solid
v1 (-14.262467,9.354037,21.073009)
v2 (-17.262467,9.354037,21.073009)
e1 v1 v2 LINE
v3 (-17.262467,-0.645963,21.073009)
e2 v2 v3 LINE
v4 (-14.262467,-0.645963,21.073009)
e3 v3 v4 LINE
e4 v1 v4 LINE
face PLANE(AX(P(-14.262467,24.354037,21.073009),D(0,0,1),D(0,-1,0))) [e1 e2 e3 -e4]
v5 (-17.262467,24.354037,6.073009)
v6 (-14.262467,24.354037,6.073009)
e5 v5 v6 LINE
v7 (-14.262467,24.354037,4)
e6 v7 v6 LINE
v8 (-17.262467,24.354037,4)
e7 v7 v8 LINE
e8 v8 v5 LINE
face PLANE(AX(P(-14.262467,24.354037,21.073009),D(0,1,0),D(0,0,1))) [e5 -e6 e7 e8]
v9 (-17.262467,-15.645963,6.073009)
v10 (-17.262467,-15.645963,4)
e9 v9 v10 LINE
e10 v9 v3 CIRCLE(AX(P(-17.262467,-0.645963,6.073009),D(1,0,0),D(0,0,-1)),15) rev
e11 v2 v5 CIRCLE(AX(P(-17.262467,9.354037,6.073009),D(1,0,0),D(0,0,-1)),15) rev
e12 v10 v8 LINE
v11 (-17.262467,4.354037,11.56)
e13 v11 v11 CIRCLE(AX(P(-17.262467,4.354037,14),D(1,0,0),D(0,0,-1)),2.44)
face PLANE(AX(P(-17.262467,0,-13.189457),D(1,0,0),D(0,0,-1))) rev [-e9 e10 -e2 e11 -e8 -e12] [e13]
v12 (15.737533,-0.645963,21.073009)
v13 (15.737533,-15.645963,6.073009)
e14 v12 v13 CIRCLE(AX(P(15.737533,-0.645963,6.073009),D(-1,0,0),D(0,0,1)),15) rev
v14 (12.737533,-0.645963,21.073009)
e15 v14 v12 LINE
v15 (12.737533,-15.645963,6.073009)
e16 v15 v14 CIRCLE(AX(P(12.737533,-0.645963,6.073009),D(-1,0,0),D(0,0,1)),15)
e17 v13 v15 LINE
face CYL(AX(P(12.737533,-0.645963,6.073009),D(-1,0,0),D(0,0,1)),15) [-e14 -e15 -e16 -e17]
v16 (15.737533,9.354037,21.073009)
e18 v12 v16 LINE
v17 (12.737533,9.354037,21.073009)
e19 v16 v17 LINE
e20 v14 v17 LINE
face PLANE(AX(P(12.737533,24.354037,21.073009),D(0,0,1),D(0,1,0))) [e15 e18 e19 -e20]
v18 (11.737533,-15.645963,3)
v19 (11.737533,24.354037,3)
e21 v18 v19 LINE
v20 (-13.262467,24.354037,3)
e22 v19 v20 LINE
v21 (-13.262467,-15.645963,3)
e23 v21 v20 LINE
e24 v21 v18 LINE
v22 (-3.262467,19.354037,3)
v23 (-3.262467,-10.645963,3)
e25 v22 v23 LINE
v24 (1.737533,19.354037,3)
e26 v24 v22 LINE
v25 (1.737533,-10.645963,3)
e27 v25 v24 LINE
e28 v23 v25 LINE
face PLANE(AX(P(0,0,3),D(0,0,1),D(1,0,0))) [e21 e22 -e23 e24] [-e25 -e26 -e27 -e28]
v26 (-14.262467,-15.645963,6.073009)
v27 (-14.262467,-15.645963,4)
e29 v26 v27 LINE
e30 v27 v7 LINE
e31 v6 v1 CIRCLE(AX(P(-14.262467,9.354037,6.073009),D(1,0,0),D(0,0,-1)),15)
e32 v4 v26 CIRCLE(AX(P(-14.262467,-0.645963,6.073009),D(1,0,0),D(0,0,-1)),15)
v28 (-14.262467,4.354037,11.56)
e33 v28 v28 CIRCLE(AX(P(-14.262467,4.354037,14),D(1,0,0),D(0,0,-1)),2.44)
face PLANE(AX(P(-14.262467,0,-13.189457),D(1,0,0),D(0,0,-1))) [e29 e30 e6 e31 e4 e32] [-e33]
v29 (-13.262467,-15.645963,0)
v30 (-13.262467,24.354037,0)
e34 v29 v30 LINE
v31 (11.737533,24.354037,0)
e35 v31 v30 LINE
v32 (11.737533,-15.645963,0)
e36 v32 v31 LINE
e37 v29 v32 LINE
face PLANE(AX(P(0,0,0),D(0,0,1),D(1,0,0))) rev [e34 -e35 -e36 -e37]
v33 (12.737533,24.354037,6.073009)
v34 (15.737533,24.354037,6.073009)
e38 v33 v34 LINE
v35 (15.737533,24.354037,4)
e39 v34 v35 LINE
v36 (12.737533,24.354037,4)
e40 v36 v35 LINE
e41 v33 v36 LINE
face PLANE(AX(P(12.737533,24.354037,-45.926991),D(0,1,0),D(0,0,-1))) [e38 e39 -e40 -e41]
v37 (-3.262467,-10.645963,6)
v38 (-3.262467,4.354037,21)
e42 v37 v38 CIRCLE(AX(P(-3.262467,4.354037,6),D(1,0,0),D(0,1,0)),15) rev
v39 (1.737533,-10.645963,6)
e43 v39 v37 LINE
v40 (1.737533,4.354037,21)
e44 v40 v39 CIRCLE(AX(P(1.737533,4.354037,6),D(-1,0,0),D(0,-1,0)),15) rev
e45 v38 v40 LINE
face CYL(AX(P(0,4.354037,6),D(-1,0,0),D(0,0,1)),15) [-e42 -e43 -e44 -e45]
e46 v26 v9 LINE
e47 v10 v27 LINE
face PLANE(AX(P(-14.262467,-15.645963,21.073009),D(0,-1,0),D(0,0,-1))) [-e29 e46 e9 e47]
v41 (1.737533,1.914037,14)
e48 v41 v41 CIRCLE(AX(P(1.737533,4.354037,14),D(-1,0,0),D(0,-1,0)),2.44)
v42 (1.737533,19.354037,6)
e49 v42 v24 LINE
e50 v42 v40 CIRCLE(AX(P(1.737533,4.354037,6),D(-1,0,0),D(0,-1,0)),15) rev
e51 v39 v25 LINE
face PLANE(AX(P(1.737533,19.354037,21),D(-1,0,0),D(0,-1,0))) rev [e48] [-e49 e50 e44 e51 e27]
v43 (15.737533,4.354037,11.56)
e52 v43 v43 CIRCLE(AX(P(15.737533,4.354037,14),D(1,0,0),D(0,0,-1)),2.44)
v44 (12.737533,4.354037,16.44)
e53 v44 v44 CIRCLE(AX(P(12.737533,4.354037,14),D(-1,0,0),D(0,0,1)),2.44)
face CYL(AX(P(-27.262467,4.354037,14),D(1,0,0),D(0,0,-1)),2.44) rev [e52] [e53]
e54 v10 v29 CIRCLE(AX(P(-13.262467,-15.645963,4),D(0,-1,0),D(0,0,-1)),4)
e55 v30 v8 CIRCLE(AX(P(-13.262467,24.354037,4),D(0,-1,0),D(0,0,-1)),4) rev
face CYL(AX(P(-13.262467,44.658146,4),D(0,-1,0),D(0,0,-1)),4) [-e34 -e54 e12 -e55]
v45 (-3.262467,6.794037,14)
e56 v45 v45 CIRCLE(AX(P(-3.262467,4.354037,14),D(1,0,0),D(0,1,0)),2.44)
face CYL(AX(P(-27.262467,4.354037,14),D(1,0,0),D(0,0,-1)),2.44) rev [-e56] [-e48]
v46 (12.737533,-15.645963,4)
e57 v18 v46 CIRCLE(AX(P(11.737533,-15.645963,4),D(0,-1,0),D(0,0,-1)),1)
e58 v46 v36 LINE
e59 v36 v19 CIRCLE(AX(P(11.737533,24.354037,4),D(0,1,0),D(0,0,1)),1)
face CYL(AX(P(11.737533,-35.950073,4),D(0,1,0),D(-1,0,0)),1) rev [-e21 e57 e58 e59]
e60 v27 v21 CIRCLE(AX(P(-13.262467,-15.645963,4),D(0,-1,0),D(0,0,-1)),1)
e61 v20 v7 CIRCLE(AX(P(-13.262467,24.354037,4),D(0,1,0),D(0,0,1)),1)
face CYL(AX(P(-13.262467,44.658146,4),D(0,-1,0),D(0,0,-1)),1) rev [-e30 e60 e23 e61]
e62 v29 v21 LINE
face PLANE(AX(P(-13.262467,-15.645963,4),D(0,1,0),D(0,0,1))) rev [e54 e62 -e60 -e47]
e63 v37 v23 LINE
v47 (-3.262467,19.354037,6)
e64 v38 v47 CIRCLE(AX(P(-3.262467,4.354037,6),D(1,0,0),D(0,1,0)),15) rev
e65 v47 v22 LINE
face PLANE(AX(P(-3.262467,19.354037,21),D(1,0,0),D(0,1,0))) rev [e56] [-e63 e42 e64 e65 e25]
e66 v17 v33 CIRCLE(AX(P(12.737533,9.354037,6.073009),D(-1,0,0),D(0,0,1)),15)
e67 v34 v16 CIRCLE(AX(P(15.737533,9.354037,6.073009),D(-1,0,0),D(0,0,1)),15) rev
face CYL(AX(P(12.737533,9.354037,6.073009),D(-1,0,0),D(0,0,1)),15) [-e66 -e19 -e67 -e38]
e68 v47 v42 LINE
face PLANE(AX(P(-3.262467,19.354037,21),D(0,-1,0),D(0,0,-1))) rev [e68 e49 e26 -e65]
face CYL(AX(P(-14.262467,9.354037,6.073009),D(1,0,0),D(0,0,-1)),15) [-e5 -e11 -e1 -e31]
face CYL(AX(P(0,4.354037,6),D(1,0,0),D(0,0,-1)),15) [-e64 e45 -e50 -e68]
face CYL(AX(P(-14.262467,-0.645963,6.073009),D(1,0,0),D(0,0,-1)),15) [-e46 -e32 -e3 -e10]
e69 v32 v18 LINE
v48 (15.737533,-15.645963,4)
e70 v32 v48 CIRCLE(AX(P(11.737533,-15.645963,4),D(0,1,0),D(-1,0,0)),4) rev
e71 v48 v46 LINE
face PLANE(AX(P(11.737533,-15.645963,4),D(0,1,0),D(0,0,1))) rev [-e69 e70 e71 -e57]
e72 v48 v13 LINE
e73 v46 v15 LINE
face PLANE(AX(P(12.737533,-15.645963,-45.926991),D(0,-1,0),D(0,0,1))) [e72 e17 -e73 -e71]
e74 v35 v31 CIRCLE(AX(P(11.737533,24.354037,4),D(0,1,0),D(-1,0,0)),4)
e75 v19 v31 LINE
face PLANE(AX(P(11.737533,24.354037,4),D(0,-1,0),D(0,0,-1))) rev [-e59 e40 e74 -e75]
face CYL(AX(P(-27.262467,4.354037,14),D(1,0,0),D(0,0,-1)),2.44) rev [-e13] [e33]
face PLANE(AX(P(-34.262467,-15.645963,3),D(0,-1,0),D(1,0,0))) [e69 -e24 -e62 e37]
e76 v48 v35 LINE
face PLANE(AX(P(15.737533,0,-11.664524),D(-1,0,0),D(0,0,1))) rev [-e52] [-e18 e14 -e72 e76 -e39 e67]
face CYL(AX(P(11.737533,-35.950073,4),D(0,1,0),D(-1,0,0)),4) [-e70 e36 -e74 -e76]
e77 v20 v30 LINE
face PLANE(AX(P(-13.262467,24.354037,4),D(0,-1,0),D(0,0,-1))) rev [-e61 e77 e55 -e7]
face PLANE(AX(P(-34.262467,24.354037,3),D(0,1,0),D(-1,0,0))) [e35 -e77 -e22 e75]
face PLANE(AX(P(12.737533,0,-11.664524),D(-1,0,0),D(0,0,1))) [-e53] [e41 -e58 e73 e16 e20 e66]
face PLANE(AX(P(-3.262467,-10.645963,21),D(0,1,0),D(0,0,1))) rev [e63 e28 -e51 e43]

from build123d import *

# Parameters (mm, degrees)
SKETCH_2_W          = 67
SKETCH_2_H          = 40
EXTRUDE_1_DEPTH     = 3
OTHER_START         = -15.645963378
OTHER_1_DEPTH       = 40
OTHER_1_2_DEPTH     = 40
SKETCH_8_W          = 5
SKETCH_8_H          = 30
EXTRUDE_2_DEPTH     = 18
FILLET_2_R          = 15
FILLET_3_R          = 15
SKETCH_9_R          = 2.44
CUT_EXTRUDE_1_DEPTH = 43


# Read off the part's stored shape, not the designer's step: 绘制的折弯1
with BuildPart() as part:
    # Sketch 2 → 凸台-拉伸1 (new body)
    with BuildSketch(Plane.XY):
        with Locations((-0.762466526, 4.354036622)):
            Rectangle(SKETCH_2_W, SKETCH_2_H)
    extrude(amount=EXTRUDE_1_DEPTH)

    # Other 1 outline → Other 1 (cut)
    with BuildSketch(Plane(origin=(0, 0, 0), x_dir=(1, 0, 0), z_dir=(0, 1, 0)).offset(OTHER_START)):
        with BuildLine():
            Line((-34.262466526, -3), (-17.135449872, -3))
            ThreePointArc((-17.135449872, -3), (-15.711956269, -0.83772234), (-13.262466526, 0))
            Line((-13.262466526, 0), (-34.262466526, 0))
            Line((-34.262466526, 0), (-34.262466526, -3))
        make_face()
        with BuildLine():
            ThreePointArc((11.737533474, 0), (14.187023217, -0.83772234), (15.61051682, -3))
            Line((15.61051682, -3), (32.737533474, -3))
            Line((32.737533474, -3), (32.737533474, 0))
            Line((32.737533474, 0), (11.737533474, 0))
        make_face()
    extrude(amount=OTHER_1_DEPTH, mode=Mode.SUBTRACT)

    # Other 1 2 outline → Other 1 2 (add)
    with BuildSketch(Plane(origin=(0, 0, 0), x_dir=(1, 0, 0), z_dir=(0, 1, 0)).offset(OTHER_START)):
        with BuildLine():
            Line((-14.262466526, -21.073009183), (-14.262466526, -4))
            ThreePointArc((-14.262466526, -4), (-13.969573307, -3.292893219), (-13.262466526, -3))
            Line((-13.262466526, -3), (-17.135449872, -3))
            ThreePointArc((-17.135449872, -3), (-17.230585311, -3.49598283), (-17.262466526, -4))
            Line((-17.262466526, -4), (-17.262466526, -21.073009183))
            Line((-17.262466526, -21.073009183), (-14.262466526, -21.073009183))
        make_face()
        with BuildLine():
            Line((15.61051682, -3), (11.737533474, -3))
            ThreePointArc((11.737533474, -3), (12.444640255, -3.292893219), (12.737533474, -4))
            Line((12.737533474, -4), (12.737533474, -21.073009183))
            Line((12.737533474, -21.073009183), (15.737533474, -21.073009183))
            Line((15.737533474, -21.073009183), (15.737533474, -4))
            ThreePointArc((15.737533474, -4), (15.705652259, -3.49598283), (15.61051682, -3))
        make_face()
    extrude(amount=OTHER_1_2_DEPTH)

    # 草图8 → 凸台-拉伸2 (add)
    with BuildSketch(Plane.XY.offset(3)):
        with Locations((-0.762466526, 4.354036622)):
            Rectangle(SKETCH_8_W, SKETCH_8_H)
    extrude(amount=EXTRUDE_2_DEPTH)

    # 圆角2
    fillet_2_edges = [part.edges().sort_by_distance(p)[0] for p in [
        (-15.762466526, 24.354036622, 21.073009183),
    ]]
    fillet(fillet_2_edges, radius=FILLET_2_R)

    # 圆角3
    fillet_3_edges = [part.edges().sort_by_distance(p)[0] for p in [
        (14.237533474, -15.645963378, 21.073009183),
        (14.237533474, 24.354036622, 21.073009183),
        (-0.762466526, 19.354036622, 21),
        (-0.762466526, -10.645963378, 21),
        (-15.762466526, -15.645963378, 21.073009183),
    ]]
    fillet(fillet_3_edges, radius=FILLET_3_R - 0.0001)  # a hair under: the kernel refuses the full size

    # 草图9 → 切除-拉伸1 (cut)
    with BuildSketch(Plane(origin=(15.737533474, 0, 0), x_dir=(0, 0, -1), z_dir=(1, 0, 0))):
        with Locations(Location((-14, 4.354036622, 0), (0, 0, 90))):
            Circle(SKETCH_9_R)
    extrude(amount=-CUT_EXTRUDE_1_DEPTH, mode=Mode.SUBTRACT)


solid = part.part
